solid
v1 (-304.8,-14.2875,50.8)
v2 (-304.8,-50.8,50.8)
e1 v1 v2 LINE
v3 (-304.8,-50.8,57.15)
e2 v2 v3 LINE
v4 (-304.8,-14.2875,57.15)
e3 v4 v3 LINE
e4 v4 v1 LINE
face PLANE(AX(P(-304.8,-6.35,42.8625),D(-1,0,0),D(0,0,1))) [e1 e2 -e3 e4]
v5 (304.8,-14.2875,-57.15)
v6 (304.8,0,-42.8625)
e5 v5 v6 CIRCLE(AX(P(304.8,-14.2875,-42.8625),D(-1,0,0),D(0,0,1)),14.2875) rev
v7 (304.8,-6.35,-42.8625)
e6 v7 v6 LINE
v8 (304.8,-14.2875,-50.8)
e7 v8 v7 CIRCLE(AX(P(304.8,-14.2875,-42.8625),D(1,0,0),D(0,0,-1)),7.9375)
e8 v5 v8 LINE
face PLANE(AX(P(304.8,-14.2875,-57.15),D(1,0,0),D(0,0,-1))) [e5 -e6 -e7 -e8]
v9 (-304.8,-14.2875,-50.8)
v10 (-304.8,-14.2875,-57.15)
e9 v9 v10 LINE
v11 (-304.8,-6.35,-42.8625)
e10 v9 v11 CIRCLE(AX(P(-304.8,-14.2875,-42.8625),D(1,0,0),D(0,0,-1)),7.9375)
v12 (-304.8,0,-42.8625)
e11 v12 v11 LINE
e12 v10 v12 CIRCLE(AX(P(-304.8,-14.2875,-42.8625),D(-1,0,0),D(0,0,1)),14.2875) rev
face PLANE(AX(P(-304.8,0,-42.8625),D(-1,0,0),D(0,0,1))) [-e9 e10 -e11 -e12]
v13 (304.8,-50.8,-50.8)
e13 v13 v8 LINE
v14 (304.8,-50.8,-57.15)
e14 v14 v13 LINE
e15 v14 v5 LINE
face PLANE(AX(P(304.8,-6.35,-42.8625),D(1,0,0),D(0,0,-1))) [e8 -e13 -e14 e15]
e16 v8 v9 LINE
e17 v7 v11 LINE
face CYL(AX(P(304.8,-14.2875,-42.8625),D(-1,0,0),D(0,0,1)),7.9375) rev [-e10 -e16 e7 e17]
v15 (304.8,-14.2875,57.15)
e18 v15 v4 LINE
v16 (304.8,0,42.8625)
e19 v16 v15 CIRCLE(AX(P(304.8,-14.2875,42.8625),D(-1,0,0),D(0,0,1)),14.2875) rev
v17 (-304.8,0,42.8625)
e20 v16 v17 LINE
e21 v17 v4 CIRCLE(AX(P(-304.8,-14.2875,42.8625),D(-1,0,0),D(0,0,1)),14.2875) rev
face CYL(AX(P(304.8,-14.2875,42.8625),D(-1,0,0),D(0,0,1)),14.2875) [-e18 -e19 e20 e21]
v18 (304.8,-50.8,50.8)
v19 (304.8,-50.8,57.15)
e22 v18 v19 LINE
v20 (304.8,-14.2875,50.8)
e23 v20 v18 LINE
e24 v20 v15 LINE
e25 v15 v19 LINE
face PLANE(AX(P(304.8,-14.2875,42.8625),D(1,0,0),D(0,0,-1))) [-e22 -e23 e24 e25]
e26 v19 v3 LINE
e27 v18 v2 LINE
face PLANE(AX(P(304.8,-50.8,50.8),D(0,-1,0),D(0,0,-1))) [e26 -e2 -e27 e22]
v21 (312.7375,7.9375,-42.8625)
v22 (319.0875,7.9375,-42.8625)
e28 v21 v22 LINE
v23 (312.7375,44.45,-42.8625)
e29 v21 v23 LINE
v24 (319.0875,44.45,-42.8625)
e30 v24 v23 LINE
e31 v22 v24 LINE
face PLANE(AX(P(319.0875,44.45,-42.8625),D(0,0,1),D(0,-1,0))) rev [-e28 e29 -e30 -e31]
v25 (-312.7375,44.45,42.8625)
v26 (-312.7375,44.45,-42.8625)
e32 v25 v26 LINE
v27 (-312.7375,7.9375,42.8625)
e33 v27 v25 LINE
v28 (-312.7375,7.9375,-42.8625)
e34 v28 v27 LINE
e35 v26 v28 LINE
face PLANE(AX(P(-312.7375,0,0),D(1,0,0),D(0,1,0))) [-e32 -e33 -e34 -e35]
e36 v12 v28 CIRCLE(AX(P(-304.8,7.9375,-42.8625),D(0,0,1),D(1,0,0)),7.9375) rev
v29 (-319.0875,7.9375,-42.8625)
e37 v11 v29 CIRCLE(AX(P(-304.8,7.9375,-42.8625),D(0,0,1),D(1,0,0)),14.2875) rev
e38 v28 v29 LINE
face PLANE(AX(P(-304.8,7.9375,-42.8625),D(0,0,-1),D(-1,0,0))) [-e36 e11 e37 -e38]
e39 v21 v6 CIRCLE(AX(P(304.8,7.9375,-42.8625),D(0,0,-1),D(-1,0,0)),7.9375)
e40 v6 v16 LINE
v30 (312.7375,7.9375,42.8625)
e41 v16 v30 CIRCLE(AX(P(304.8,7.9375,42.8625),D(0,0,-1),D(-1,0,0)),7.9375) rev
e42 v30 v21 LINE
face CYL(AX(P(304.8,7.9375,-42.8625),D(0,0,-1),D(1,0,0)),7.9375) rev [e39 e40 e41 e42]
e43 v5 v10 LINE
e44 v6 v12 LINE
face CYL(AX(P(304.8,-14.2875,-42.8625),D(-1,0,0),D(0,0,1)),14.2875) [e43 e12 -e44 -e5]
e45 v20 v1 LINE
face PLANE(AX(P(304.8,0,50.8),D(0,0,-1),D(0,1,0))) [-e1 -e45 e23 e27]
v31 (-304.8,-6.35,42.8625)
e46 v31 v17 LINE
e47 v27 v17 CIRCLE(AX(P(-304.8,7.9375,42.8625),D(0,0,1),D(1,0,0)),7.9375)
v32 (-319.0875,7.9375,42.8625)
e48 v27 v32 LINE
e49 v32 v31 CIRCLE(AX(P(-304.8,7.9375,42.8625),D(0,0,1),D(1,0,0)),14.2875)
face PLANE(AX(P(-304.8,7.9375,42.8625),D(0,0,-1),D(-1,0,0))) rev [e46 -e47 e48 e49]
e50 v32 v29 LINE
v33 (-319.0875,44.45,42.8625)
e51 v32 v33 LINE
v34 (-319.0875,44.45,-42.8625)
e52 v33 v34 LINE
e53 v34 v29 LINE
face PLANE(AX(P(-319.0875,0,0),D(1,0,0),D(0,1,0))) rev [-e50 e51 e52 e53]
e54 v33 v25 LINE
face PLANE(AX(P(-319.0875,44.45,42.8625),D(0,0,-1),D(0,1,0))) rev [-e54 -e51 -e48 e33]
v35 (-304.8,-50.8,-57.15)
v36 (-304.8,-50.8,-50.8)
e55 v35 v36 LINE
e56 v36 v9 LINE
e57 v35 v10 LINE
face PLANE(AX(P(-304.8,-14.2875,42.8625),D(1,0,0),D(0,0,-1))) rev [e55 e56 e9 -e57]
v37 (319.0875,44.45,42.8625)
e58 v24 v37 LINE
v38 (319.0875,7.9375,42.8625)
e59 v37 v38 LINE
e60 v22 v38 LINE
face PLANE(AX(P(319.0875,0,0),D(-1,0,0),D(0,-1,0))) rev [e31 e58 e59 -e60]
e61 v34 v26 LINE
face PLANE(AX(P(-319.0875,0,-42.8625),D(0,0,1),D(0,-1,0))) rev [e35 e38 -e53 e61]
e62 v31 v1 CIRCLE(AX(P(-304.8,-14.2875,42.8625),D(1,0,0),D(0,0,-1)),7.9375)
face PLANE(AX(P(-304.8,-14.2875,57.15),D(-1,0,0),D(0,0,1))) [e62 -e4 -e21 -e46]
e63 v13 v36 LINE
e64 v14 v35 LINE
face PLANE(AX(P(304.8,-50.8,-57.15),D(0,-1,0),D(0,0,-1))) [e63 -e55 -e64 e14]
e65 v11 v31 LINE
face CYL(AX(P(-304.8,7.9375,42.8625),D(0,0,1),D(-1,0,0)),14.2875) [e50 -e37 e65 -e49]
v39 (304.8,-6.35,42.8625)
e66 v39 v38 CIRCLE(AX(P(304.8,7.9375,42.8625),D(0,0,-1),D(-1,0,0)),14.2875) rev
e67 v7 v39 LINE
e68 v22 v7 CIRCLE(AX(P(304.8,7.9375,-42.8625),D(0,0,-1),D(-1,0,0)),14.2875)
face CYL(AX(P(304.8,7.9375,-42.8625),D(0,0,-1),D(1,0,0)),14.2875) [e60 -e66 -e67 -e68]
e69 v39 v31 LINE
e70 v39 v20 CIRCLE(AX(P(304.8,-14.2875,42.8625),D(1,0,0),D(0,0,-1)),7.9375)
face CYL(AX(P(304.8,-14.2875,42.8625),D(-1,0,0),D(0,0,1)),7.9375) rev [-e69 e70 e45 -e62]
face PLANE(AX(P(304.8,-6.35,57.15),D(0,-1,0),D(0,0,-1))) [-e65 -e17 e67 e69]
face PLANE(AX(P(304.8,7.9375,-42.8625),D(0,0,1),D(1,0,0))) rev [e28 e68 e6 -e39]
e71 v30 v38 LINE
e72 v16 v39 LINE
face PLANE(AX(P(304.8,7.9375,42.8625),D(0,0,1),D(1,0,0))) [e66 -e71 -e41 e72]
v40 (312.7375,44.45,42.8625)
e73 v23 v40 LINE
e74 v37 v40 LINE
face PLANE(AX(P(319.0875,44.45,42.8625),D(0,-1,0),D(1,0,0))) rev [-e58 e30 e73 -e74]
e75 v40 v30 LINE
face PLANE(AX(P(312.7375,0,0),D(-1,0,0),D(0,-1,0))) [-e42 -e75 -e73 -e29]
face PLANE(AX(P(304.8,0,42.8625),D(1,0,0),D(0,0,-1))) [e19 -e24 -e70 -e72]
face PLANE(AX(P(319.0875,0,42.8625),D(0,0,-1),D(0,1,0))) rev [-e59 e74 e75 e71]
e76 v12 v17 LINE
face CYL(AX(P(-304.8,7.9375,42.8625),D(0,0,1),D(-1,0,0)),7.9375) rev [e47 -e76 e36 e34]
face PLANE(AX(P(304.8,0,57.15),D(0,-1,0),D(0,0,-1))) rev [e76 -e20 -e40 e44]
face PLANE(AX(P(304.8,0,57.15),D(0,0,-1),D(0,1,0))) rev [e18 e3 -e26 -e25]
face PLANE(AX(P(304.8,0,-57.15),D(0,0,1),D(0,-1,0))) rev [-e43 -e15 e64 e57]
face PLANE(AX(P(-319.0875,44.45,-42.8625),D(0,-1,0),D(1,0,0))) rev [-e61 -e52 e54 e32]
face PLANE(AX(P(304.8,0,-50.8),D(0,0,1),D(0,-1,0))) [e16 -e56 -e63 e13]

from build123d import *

# Parameters (mm, degrees)
BASE_FLANGE1_DEPTH      = 304.8
EDGE_FLANGE1_DEPTH      = 85.725
EDGE_FLANGE1_BEND_DEPTH = 85.725


# Sheet-metal steps are written as plain solids
with BuildPart() as part:
    # Sketch1 → Base-Flange1 (new, symmetric)
    with BuildSketch(Plane(origin=(0, 0, 0), x_dir=(0, 0, -1), z_dir=(1, 0, 0))):
        with BuildLine():
            Line((-57.15, -50.8), (-57.15, -14.2875))
            ThreePointArc((-57.15, -14.2875), (-52.965288136, -4.184711864), (-42.8625, 0))
            Line((-42.8625, 0), (42.8625, 0))
            ThreePointArc((42.8625, 0), (52.965288136, -4.184711864), (57.15, -14.2875))
            Line((57.15, -14.2875), (57.15, -50.8))
            Line((57.15, -50.8), (50.8, -50.8))
            Line((50.8, -50.8), (50.8, -14.2875))
            ThreePointArc((50.8, -14.2875), (48.475160076, -8.674839924), (42.8625, -6.35))
            Line((42.8625, -6.35), (-42.8625, -6.35))
            ThreePointArc((-42.8625, -6.35), (-48.475160076, -8.674839924), (-50.8, -14.2875))
            Line((-50.8, -14.2875), (-50.8, -50.8))
            Line((-50.8, -50.8), (-57.15, -50.8))
        make_face()
    extrude(amount=BASE_FLANGE1_DEPTH, both=True)

    # Edge-Flange1 section (across the edge) → Edge-Flange1 (add)
    with BuildSketch(Plane(origin=(312.7375, 0, 42.8625), x_dir=(-1, 0, 0), z_dir=(0, 0, -1))):
        with BuildLine():
            Line((-6.35, 7.9375), (-6.35, 44.45))
            Line((-6.35, 44.45), (0, 44.45))
            Line((0, 44.45), (0, 7.9375))
            ThreePointArc((0, 7.9375), (2.324839924, 2.324839924), (7.9375, 0))
            Line((7.9375, 0), (7.9375, -6.35))
            ThreePointArc((7.9375, -6.35), (-2.165288136, -2.165288136), (-6.35, 7.9375))
        make_face()
    extrude(amount=EDGE_FLANGE1_DEPTH)

    # Edge-Flange1 section 2 (across the edge) → Edge-Flange1 bend (add)
    with BuildSketch(Plane(origin=(-312.7375, 0, -42.8625), x_dir=(1, 0, 0), z_dir=(0, 0, 1))):
        with BuildLine():
            Line((-6.35, 7.9375), (-6.35, 44.45))
            Line((-6.35, 44.45), (0, 44.45))
            Line((0, 44.45), (0, 7.9375))
            ThreePointArc((0, 7.9375), (2.324839924, 2.324839924), (7.9375, 0))
            Line((7.9375, 0), (7.9375, -6.35))
            ThreePointArc((7.9375, -6.35), (-2.165288136, -2.165288136), (-6.35, 7.9375))
        make_face()
    extrude(amount=EDGE_FLANGE1_BEND_DEPTH)


solid = part.part
